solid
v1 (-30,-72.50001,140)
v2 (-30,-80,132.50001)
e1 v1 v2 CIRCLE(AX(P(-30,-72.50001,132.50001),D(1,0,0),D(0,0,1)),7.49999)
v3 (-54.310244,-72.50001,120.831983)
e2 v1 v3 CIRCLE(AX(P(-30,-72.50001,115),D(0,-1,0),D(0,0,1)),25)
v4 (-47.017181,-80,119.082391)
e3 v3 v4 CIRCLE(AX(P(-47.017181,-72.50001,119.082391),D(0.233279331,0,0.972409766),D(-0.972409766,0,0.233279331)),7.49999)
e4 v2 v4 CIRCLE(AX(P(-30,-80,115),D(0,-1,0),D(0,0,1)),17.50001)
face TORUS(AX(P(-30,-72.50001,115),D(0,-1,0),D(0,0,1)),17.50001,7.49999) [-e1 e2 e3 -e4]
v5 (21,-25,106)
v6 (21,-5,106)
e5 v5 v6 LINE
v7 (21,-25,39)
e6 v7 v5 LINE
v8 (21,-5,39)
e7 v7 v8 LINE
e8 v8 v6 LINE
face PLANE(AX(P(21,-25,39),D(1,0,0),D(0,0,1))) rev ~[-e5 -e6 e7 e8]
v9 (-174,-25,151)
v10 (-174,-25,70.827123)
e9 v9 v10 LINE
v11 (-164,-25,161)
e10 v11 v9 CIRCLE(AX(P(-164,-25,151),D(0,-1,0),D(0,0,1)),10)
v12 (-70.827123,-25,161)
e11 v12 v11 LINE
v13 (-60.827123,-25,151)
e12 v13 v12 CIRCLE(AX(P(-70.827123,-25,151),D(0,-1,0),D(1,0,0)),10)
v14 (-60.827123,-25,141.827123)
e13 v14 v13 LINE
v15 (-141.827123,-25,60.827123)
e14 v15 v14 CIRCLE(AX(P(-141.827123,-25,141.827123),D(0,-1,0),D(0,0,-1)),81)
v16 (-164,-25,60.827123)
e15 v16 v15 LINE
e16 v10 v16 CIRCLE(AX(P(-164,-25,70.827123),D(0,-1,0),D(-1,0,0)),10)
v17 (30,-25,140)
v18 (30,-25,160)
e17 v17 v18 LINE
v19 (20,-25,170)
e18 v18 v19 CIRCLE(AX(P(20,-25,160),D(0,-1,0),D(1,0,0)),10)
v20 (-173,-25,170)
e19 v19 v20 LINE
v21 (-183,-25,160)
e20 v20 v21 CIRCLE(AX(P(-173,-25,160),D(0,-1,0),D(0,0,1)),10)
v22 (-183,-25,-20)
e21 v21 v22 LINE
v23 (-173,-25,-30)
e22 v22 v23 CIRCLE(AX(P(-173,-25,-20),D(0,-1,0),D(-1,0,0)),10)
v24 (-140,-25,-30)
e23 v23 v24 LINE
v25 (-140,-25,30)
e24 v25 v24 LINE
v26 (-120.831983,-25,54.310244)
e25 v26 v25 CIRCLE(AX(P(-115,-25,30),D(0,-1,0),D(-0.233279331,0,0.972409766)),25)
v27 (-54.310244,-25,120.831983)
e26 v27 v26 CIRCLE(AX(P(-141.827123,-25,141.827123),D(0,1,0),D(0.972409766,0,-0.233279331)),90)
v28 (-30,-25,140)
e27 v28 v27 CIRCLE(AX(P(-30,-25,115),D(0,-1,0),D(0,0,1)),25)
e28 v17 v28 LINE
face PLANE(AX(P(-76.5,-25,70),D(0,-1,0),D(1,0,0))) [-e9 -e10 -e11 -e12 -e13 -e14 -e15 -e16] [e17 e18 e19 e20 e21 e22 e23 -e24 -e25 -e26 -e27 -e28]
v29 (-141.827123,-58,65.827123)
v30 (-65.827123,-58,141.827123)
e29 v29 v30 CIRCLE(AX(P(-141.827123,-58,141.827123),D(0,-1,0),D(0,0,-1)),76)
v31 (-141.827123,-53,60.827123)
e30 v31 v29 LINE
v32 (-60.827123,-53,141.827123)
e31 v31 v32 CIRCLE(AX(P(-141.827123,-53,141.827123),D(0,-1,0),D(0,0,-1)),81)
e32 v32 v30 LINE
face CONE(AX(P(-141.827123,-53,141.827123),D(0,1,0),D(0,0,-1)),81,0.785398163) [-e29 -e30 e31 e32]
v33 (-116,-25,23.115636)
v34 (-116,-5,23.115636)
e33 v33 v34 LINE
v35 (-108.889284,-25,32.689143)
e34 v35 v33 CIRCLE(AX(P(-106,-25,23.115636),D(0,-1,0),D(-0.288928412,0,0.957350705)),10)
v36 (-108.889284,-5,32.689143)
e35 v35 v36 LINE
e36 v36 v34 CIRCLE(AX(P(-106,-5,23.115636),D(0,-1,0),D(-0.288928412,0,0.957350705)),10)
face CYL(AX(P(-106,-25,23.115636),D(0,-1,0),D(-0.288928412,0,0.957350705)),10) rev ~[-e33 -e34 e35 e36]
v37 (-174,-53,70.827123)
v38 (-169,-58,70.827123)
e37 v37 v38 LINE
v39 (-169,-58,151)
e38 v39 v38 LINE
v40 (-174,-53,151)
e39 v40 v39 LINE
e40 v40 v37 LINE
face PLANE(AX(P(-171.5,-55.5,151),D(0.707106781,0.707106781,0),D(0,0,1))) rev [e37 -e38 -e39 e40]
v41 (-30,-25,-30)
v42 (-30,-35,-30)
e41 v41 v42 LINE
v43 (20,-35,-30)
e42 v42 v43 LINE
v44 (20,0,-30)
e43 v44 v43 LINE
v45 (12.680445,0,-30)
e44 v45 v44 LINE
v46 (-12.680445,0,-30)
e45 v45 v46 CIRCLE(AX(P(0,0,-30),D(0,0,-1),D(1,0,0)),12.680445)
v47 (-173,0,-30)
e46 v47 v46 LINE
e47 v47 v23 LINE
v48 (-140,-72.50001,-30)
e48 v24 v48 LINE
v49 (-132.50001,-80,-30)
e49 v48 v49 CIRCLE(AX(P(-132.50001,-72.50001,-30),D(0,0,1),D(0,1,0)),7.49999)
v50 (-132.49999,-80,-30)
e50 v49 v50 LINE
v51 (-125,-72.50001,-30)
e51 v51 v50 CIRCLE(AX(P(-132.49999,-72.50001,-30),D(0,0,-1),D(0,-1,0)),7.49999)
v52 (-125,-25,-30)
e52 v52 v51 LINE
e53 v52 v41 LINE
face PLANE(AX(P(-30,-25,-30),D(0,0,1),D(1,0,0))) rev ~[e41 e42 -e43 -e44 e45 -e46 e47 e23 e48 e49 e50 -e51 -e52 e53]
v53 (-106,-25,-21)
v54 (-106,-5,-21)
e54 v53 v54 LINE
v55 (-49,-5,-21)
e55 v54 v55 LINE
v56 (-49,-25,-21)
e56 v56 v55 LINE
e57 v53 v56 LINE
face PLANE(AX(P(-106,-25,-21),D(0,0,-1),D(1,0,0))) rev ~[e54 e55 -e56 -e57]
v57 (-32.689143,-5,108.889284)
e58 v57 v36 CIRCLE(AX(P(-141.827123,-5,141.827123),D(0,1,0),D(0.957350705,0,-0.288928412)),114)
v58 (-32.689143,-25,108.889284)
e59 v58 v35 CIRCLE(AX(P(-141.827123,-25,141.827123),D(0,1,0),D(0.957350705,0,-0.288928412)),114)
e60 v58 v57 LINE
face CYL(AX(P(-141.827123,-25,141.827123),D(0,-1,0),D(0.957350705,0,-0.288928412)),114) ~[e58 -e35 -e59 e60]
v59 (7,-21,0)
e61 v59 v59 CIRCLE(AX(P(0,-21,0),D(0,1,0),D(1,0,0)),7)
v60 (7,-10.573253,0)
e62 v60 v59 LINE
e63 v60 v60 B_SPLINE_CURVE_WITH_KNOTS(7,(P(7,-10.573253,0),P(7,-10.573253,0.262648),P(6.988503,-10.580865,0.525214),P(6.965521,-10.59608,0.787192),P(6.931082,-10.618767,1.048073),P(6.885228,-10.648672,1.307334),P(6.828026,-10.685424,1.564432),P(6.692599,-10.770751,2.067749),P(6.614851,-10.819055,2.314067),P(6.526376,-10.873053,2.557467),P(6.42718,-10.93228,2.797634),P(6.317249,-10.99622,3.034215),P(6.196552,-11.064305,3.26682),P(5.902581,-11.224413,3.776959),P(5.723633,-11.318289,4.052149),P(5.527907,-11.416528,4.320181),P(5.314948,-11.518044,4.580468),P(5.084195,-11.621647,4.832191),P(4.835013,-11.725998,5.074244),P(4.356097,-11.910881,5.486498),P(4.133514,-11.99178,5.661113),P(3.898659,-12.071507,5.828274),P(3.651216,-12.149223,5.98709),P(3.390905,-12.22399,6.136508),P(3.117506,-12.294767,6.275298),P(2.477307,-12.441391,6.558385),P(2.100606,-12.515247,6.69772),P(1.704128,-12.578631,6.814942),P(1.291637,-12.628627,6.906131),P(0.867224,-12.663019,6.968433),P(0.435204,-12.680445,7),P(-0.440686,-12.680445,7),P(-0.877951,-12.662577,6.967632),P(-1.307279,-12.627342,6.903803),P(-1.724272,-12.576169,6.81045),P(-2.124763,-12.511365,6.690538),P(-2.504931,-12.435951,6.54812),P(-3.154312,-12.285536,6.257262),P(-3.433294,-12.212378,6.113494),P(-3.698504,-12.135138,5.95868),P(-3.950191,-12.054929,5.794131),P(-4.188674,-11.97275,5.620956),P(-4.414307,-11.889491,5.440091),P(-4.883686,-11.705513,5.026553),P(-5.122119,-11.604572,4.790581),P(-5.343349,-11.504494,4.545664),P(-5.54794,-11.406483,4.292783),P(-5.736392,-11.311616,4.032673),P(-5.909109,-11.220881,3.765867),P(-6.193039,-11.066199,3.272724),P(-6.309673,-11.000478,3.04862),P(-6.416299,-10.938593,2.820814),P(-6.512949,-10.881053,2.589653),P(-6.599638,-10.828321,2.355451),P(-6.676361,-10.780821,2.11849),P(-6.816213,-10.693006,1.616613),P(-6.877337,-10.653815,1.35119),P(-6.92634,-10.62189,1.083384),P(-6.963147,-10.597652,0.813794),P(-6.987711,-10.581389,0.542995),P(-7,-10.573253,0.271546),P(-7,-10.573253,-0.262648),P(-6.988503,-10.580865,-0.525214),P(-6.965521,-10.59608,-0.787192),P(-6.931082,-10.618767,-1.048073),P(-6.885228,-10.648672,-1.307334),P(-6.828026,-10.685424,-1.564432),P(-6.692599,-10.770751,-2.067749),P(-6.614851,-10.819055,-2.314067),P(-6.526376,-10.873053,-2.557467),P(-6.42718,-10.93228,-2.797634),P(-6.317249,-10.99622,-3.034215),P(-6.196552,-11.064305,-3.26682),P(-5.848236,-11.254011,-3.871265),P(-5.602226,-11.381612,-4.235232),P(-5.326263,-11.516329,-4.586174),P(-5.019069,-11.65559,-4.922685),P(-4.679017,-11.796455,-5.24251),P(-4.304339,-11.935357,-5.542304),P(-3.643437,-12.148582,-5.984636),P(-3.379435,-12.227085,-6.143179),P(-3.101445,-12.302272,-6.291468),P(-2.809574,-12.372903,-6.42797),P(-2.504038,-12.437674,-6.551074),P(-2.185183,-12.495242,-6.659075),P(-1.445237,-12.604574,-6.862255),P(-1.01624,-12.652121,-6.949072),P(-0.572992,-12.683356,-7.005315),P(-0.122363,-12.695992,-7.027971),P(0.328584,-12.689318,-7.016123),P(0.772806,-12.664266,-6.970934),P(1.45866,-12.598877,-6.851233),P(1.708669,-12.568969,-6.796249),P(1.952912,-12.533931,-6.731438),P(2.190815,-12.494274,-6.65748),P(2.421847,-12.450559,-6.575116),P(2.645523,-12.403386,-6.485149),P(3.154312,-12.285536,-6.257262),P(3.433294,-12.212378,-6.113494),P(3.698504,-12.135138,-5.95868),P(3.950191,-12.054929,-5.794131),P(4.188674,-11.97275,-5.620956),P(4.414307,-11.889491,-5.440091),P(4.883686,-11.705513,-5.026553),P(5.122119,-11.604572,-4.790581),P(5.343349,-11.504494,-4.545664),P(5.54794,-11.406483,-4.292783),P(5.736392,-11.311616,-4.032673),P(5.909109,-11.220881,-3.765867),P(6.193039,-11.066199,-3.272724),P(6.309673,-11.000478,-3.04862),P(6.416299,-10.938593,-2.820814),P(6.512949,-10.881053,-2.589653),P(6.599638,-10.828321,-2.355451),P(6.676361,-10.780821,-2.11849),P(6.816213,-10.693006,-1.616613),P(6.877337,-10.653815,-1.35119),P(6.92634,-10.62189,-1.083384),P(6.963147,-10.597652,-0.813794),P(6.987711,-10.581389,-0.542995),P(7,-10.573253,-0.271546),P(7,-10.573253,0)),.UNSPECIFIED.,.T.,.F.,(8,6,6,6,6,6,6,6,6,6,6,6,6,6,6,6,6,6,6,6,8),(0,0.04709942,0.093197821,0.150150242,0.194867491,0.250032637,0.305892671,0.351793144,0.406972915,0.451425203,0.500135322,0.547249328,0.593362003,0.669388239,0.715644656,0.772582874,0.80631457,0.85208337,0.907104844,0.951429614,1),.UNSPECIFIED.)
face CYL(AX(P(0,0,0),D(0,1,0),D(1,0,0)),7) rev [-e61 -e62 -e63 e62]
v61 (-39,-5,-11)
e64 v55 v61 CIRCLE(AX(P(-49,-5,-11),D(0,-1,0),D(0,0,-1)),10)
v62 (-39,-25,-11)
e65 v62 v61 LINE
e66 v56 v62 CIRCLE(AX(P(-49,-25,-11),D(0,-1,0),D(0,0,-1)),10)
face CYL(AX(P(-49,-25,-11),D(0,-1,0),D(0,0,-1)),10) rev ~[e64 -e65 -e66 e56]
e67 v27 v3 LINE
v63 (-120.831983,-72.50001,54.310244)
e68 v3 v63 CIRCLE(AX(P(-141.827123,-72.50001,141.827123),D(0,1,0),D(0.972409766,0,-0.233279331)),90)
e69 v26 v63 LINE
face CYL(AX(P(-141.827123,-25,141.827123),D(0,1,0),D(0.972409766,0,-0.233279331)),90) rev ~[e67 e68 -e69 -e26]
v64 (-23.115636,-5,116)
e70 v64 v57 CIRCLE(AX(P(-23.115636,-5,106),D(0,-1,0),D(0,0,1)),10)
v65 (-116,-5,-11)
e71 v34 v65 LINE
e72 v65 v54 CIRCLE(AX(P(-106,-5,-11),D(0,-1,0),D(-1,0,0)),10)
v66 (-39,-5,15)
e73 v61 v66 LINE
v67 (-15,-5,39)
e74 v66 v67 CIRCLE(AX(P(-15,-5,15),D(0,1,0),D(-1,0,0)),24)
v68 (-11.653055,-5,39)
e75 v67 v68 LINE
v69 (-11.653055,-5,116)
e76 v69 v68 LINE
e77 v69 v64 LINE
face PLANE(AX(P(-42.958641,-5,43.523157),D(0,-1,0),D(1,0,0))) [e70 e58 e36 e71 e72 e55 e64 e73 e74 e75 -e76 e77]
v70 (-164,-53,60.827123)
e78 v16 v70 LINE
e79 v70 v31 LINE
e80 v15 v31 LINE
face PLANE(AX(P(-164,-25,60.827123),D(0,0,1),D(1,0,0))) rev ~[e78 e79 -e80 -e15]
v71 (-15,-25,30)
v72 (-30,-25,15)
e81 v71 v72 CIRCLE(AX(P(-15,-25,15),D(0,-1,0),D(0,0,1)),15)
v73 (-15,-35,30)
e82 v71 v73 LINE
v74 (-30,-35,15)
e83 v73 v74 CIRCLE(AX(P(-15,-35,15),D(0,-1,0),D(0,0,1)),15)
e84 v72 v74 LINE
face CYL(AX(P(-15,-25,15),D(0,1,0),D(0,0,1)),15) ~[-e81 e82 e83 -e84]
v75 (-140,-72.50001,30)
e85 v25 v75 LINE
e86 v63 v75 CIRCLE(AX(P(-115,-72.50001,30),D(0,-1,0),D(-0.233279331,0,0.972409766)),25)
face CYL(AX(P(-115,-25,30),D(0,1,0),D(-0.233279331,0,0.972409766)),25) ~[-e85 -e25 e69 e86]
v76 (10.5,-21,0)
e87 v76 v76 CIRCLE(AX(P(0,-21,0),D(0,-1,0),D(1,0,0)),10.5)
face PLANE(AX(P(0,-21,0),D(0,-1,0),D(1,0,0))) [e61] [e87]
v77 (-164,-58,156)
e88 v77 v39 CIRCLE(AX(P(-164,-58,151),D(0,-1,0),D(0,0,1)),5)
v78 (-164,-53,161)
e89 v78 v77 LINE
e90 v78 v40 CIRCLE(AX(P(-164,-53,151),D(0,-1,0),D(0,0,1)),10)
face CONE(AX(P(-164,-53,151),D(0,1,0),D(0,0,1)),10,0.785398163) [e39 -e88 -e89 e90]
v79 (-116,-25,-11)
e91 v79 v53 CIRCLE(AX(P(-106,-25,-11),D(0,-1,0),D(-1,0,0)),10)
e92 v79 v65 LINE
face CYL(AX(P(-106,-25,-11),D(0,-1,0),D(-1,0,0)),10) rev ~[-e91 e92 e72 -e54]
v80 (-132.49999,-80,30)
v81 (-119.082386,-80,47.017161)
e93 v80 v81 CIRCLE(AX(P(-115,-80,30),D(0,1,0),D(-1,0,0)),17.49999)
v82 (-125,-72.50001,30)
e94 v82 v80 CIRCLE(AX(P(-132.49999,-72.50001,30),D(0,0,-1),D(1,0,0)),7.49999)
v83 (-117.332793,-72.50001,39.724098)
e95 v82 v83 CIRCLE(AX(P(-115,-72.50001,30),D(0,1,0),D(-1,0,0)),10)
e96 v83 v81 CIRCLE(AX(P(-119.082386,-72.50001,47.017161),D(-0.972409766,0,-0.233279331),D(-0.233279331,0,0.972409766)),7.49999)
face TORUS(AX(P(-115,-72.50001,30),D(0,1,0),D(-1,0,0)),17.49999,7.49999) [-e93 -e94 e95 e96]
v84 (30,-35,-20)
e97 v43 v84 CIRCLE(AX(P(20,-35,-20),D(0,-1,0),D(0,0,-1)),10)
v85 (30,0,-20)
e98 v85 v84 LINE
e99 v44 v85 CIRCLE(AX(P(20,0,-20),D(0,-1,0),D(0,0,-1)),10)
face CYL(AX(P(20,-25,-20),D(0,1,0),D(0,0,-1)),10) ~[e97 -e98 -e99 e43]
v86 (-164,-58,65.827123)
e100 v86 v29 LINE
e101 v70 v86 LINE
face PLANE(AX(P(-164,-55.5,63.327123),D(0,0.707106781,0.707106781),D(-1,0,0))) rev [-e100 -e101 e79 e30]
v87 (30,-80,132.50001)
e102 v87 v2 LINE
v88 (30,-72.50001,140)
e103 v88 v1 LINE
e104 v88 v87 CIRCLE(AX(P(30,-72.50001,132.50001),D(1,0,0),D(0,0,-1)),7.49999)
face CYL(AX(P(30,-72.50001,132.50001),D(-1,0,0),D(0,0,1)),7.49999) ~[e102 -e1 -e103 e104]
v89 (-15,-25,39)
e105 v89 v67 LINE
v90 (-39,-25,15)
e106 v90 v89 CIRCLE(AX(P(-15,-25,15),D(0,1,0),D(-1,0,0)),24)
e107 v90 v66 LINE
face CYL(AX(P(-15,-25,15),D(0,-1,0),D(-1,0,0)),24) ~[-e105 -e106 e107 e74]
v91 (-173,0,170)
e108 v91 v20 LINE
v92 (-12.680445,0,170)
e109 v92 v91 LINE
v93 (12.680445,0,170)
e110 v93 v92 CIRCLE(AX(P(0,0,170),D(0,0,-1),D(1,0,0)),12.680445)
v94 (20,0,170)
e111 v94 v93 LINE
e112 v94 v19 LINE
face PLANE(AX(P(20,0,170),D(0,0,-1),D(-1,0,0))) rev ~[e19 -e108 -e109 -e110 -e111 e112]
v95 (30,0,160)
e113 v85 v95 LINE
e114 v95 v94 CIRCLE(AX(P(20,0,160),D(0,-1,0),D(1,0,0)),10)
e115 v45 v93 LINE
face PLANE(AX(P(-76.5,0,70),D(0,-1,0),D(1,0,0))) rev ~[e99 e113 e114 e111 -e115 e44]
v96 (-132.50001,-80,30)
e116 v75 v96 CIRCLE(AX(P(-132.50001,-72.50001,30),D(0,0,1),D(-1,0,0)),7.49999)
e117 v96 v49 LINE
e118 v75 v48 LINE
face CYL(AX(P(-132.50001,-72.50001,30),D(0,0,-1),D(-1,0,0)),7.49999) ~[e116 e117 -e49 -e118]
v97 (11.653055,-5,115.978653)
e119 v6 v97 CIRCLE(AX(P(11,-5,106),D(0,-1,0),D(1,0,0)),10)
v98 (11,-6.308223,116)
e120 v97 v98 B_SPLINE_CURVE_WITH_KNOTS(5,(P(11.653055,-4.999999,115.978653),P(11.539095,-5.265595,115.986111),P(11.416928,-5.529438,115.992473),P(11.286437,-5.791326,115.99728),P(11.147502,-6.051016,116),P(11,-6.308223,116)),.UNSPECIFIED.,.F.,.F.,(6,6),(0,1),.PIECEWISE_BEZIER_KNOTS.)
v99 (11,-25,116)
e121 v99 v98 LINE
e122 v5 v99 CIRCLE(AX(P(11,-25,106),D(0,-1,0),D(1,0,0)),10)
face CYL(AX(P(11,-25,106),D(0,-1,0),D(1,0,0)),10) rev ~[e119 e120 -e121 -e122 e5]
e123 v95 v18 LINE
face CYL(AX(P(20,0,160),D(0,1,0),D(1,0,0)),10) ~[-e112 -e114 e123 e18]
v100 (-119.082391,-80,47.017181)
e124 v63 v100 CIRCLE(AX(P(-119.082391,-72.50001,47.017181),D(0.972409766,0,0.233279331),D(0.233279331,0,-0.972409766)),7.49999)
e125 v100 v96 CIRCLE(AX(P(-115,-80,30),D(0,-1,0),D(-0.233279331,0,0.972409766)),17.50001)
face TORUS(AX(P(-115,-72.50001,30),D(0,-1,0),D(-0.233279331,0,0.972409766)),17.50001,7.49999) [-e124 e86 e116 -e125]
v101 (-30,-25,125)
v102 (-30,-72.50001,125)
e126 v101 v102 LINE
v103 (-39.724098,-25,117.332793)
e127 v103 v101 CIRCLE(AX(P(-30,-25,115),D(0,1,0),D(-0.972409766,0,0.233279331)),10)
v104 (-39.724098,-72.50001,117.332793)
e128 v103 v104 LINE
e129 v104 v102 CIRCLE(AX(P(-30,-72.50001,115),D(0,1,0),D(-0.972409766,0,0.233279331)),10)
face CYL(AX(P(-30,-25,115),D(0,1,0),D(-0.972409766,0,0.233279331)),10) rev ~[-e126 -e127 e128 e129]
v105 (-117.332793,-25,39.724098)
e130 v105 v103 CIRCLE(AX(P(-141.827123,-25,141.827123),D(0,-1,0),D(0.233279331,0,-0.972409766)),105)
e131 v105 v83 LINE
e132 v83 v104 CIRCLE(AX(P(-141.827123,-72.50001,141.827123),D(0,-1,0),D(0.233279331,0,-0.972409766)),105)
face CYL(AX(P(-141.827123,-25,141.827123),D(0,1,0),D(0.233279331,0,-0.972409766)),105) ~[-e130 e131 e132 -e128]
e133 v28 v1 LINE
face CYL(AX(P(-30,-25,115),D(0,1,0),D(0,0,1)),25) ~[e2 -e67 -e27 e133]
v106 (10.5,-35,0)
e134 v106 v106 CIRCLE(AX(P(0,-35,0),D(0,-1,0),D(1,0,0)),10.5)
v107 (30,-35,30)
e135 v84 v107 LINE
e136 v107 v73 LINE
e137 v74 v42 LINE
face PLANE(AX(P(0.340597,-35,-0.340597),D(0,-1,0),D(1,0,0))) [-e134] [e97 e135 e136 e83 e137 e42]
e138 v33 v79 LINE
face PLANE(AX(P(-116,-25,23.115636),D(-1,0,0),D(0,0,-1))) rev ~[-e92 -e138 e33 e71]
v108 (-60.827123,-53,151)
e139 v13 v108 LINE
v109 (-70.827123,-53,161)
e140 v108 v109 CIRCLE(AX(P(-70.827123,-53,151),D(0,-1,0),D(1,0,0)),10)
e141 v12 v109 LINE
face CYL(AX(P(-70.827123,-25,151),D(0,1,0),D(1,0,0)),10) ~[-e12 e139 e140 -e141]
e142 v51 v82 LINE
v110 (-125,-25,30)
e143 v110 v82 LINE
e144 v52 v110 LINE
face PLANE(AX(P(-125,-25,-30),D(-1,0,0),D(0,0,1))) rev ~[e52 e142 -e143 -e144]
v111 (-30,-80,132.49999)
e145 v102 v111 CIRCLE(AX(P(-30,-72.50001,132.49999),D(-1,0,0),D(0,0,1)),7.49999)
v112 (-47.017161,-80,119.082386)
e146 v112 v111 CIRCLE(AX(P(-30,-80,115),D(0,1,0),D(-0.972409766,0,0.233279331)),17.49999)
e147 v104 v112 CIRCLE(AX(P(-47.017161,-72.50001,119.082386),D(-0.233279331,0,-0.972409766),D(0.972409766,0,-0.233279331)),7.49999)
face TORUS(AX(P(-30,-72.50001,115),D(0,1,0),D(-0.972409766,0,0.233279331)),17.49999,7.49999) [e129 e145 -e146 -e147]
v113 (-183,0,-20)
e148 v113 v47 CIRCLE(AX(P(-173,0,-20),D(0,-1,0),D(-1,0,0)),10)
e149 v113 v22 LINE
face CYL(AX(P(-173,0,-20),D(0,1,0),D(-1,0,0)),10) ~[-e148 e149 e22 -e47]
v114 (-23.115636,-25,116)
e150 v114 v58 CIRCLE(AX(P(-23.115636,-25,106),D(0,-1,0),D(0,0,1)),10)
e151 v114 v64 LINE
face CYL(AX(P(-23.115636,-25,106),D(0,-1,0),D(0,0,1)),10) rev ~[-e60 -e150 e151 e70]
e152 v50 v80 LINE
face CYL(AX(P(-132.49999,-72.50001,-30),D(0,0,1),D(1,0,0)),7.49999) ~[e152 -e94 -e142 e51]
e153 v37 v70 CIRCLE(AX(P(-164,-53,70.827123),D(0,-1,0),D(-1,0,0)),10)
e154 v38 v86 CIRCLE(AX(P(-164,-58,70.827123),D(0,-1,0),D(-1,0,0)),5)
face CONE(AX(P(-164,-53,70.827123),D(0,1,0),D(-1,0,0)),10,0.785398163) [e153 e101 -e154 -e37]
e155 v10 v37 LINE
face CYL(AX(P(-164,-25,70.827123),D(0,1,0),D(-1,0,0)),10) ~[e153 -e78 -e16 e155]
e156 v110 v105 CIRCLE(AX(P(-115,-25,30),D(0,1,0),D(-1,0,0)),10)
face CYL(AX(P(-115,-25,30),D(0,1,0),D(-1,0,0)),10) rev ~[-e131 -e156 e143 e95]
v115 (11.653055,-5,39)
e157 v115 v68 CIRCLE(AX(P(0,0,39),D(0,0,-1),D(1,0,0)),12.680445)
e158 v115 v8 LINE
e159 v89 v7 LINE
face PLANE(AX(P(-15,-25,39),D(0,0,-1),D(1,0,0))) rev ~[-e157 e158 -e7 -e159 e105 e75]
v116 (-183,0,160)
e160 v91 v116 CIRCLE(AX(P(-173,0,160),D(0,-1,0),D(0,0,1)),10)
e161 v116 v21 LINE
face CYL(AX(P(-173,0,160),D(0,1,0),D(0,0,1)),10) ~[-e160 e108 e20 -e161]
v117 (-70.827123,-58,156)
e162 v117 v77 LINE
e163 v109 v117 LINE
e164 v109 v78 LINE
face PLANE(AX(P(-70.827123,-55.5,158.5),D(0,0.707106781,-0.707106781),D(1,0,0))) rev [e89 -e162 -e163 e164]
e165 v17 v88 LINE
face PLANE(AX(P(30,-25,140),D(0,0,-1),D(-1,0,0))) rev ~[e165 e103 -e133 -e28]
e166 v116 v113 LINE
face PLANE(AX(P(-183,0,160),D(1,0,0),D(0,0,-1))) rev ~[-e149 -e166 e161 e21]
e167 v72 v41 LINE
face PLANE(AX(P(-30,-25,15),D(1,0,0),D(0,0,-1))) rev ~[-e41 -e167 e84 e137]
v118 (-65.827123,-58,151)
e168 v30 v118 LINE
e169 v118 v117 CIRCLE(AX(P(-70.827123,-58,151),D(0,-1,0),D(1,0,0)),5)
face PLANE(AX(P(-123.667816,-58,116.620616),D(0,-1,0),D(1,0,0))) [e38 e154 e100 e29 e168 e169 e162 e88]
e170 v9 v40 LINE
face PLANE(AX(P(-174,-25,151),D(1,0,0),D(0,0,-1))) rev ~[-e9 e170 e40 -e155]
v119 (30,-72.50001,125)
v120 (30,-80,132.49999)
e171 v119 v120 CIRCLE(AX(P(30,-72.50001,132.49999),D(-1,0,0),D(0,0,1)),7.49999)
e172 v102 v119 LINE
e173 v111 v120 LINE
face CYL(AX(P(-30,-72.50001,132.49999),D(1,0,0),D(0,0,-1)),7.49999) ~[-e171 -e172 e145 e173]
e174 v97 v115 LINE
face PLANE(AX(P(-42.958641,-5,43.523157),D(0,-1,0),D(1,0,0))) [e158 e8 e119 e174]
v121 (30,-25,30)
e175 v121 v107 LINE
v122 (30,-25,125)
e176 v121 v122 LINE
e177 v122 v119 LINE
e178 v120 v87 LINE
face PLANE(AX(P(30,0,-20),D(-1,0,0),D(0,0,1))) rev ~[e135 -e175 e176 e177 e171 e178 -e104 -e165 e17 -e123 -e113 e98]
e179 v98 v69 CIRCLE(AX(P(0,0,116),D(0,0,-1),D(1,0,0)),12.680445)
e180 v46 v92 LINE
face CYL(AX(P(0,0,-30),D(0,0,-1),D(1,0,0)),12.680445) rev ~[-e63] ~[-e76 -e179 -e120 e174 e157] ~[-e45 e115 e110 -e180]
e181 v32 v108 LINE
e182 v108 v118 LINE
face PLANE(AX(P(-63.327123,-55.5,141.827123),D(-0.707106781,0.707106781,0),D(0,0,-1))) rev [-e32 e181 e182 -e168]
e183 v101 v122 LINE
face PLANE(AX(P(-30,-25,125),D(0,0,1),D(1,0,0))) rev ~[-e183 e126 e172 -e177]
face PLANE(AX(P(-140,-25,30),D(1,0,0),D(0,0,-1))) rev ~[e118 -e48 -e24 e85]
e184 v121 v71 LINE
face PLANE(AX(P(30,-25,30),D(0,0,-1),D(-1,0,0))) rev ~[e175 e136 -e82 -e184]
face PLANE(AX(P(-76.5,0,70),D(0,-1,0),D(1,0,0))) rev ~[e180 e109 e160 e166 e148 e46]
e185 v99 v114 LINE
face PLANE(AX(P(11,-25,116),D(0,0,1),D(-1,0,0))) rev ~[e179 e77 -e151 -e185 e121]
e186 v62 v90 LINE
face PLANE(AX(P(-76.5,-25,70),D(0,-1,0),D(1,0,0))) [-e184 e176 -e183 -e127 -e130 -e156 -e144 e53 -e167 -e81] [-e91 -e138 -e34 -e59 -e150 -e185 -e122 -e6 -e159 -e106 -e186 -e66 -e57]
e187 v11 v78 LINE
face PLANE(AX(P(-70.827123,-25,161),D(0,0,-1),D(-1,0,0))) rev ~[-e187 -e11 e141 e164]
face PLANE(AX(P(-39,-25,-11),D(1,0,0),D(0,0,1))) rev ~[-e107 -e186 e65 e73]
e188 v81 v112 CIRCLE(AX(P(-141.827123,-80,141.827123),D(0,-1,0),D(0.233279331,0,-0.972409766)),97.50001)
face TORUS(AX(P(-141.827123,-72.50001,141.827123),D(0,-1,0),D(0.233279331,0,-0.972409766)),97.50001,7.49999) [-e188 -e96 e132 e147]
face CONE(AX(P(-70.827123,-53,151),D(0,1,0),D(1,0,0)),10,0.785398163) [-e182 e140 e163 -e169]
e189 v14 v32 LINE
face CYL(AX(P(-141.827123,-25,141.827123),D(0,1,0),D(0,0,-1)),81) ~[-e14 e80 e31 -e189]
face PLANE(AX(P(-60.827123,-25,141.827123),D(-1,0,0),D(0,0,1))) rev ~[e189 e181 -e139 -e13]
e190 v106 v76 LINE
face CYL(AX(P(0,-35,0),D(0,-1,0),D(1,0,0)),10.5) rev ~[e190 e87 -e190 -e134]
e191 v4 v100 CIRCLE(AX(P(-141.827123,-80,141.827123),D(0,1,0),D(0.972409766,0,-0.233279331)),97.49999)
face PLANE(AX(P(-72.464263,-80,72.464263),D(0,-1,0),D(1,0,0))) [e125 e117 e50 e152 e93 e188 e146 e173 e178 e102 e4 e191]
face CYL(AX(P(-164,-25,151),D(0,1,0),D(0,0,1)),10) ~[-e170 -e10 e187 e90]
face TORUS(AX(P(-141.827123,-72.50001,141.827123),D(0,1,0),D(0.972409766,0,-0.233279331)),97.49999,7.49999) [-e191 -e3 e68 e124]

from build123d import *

# Parameters (mm, degrees)
F0_R      = 7
F1_DEPTH  = 25
F3_DEPTH  = 10
F4_R      = 10.5
F5_DEPTH  = 14
F7_DEPTH  = 55
F8_R      = 7.49999
F10_DEPTH = 20
F12_DEPTH = 33
F13_SIZE2 = 5
F13_SIZE  = 5
F15_DEPTH = 400


# Not quite as in the source:
# - a fillet or chamfer is up to 0.001 mm smaller than in the source, because OpenCascade refuses the exact size


with BuildPart() as f1:
    # F0 (on Front) → F1 (new body)
    with BuildSketch(Plane.XZ):
        with BuildLine():
            ThreePointArc((-183, -20), (-180.0710678119, -27.0710678119), (-173, -30))
            Line((-173, -30), (20, -30))
            ThreePointArc((20, -30), (27.0710678119, -27.0710678119), (30, -20))
            Line((30, -20), (30, 160))
            ThreePointArc((30, 160), (27.0710678119, 167.0710678119), (20, 170))
            Line((20, 170), (-173, 170))
            ThreePointArc((-173, 170), (-180.0710678119, 167.0710678119), (-183, 160))
            Line((-183, 160), (-183, -20))
        make_face()
        Circle(F0_R, mode=Mode.SUBTRACT)
    extrude(amount=F1_DEPTH)

    # F2 (on face) → F3 (join)
    with BuildSketch(Plane.XZ.offset(25)):
        with BuildLine():
            Line((-30, 15), (-30, -30))
            Line((-30, -30), (20, -30))
            ThreePointArc((20, -30), (27.0710678119, -27.0710678119), (30, -20))
            Line((30, -20), (30, 30))
            Line((30, 30), (-15, 30))
            ThreePointArc((-15, 30), (-25.6066017178, 25.6066017178), (-30, 15))
        make_face()
    extrude(amount=F3_DEPTH)

    # F4 (on face) → F5 (cut)
    with BuildSketch(Plane.XZ.offset(35)):
        Circle(F4_R)
    extrude(amount=-F5_DEPTH, mode=Mode.SUBTRACT)

    # F6 (on face) → F7 (join)
    with BuildSketch(Plane.XZ.offset(25)):
        with BuildLine():
            Line((-140, 30), (-140, -30))
            Line((-140, -30), (-125, -30))
            Line((-125, -30), (-125, 30))
            ThreePointArc((-125, 30), (-122.8526407389, 36.191609922), (-117.3327933147, 39.7240976625))
            ThreePointArc((-117.3327933147, 39.7240976625), (-67.5809110947, 67.5809110947), (-39.7240976625, 117.3327933147))
            ThreePointArc((-39.7240976625, 117.3327933147), (-36.191609922, 122.8526407389), (-30, 125))
            Line((-30, 125), (30, 125))
            Line((30, 125), (30, 140))
            Line((30, 140), (-30, 140))
            ThreePointArc((-30, 140), (-45.479024805, 134.6316018472), (-54.3102441564, 120.8319832868))
            ThreePointArc((-54.3102441564, 120.8319832868), (-78.1875128125, 78.1875128125), (-120.8319832868, 54.3102441564))
            ThreePointArc((-120.8319832868, 54.3102441564), (-134.6316018472, 45.479024805), (-140, 30))
        make_face()
    extrude(amount=F7_DEPTH)

    # F8 (radius 7.5 in the source; OpenCascade refuses exactly that, so slightly less here)
    f8_edges = [f1.edges().sort_by_distance(p)[0] for p in [
        (-125, -80, 0),
        (-140, -80, 0),
    ]]
    fillet(f8_edges, radius=F8_R)

    # F9 (on face) → F10 (cut)
    with BuildSketch(Plane.XZ.offset(25)):
        with BuildLine():
            ThreePointArc((-108.8892841225, 32.6891427357), (-114.0278528021, 29.0783179154), (-116, 23.1156356845))
            Line((-116, 23.1156356845), (-116, -11))
            ThreePointArc((-116, -11), (-113.0710678119, -18.0710678119), (-106, -21))
            Line((-106, -21), (-49, -21))
            ThreePointArc((-49, -21), (-41.9289321881, -18.0710678119), (-39, -11))
            Line((-39, -11), (-39, 15))
            ThreePointArc((-39, 15), (-31.9705627485, 31.9705627485), (-15, 39))
            Line((-15, 39), (21, 39))
            Line((21, 39), (21, 106))
            ThreePointArc((21, 106), (18.0710678119, 113.0710678119), (11, 116))
            Line((11, 116), (-23.1156356845, 116))
            ThreePointArc((-23.1156356845, 116), (-29.0783179154, 114.0278528021), (-32.6891427357, 108.8892841225))
            ThreePointArc((-32.6891427357, 108.8892841225), (-61.216950064, 61.216950064), (-108.8892841225, 32.6891427357))
        make_face()
    extrude(amount=-F10_DEPTH, mode=Mode.SUBTRACT)

    # F11 (on face) → F12 (join)
    with BuildSketch(Plane.XZ.offset(25)):
        with BuildLine():
            Line((-70.8271231193, 161), (-164, 161))
            ThreePointArc((-164, 161), (-171.0710678119, 158.0710678119), (-174, 151))
            Line((-174, 151), (-174, 70.8271231193))
            ThreePointArc((-174, 70.8271231193), (-171.0710678119, 63.7560553074), (-164, 60.8271231193))
            Line((-164, 60.8271231193), (-141.8271231193, 60.8271231193))
            ThreePointArc((-141.8271231193, 60.8271231193), (-84.5514738432, 84.5514738432), (-60.8271231193, 141.8271231193))
            Line((-60.8271231193, 141.8271231193), (-60.8271231193, 151))
            ThreePointArc((-60.8271231193, 151), (-63.7560553074, 158.0710678119), (-70.8271231193, 161))
        make_face()
    extrude(amount=F12_DEPTH)

    # F13
    f13_edges = [f1.edges().sort_by_distance(p)[0] for p in [
        (-174, -58, 110.913562),
    ]]
    chamfer(f13_edges, length=F13_SIZE, length2=F13_SIZE2)

    # F14 (on face) → F15 (cut)
    with BuildSketch(Plane(origin=(0, 0, -30), x_dir=(1, 0, 0), z_dir=(0, 0, -1))):
        with BuildLine():
            Line((-12.6804448871, 0), (12.6804448871, 0))
            ThreePointArc((12.6804448871, 0), (0, 12.6804448871), (-12.6804448871, 0))
        make_face()
    extrude(amount=-F15_DEPTH, mode=Mode.SUBTRACT)


solid = f1.part
